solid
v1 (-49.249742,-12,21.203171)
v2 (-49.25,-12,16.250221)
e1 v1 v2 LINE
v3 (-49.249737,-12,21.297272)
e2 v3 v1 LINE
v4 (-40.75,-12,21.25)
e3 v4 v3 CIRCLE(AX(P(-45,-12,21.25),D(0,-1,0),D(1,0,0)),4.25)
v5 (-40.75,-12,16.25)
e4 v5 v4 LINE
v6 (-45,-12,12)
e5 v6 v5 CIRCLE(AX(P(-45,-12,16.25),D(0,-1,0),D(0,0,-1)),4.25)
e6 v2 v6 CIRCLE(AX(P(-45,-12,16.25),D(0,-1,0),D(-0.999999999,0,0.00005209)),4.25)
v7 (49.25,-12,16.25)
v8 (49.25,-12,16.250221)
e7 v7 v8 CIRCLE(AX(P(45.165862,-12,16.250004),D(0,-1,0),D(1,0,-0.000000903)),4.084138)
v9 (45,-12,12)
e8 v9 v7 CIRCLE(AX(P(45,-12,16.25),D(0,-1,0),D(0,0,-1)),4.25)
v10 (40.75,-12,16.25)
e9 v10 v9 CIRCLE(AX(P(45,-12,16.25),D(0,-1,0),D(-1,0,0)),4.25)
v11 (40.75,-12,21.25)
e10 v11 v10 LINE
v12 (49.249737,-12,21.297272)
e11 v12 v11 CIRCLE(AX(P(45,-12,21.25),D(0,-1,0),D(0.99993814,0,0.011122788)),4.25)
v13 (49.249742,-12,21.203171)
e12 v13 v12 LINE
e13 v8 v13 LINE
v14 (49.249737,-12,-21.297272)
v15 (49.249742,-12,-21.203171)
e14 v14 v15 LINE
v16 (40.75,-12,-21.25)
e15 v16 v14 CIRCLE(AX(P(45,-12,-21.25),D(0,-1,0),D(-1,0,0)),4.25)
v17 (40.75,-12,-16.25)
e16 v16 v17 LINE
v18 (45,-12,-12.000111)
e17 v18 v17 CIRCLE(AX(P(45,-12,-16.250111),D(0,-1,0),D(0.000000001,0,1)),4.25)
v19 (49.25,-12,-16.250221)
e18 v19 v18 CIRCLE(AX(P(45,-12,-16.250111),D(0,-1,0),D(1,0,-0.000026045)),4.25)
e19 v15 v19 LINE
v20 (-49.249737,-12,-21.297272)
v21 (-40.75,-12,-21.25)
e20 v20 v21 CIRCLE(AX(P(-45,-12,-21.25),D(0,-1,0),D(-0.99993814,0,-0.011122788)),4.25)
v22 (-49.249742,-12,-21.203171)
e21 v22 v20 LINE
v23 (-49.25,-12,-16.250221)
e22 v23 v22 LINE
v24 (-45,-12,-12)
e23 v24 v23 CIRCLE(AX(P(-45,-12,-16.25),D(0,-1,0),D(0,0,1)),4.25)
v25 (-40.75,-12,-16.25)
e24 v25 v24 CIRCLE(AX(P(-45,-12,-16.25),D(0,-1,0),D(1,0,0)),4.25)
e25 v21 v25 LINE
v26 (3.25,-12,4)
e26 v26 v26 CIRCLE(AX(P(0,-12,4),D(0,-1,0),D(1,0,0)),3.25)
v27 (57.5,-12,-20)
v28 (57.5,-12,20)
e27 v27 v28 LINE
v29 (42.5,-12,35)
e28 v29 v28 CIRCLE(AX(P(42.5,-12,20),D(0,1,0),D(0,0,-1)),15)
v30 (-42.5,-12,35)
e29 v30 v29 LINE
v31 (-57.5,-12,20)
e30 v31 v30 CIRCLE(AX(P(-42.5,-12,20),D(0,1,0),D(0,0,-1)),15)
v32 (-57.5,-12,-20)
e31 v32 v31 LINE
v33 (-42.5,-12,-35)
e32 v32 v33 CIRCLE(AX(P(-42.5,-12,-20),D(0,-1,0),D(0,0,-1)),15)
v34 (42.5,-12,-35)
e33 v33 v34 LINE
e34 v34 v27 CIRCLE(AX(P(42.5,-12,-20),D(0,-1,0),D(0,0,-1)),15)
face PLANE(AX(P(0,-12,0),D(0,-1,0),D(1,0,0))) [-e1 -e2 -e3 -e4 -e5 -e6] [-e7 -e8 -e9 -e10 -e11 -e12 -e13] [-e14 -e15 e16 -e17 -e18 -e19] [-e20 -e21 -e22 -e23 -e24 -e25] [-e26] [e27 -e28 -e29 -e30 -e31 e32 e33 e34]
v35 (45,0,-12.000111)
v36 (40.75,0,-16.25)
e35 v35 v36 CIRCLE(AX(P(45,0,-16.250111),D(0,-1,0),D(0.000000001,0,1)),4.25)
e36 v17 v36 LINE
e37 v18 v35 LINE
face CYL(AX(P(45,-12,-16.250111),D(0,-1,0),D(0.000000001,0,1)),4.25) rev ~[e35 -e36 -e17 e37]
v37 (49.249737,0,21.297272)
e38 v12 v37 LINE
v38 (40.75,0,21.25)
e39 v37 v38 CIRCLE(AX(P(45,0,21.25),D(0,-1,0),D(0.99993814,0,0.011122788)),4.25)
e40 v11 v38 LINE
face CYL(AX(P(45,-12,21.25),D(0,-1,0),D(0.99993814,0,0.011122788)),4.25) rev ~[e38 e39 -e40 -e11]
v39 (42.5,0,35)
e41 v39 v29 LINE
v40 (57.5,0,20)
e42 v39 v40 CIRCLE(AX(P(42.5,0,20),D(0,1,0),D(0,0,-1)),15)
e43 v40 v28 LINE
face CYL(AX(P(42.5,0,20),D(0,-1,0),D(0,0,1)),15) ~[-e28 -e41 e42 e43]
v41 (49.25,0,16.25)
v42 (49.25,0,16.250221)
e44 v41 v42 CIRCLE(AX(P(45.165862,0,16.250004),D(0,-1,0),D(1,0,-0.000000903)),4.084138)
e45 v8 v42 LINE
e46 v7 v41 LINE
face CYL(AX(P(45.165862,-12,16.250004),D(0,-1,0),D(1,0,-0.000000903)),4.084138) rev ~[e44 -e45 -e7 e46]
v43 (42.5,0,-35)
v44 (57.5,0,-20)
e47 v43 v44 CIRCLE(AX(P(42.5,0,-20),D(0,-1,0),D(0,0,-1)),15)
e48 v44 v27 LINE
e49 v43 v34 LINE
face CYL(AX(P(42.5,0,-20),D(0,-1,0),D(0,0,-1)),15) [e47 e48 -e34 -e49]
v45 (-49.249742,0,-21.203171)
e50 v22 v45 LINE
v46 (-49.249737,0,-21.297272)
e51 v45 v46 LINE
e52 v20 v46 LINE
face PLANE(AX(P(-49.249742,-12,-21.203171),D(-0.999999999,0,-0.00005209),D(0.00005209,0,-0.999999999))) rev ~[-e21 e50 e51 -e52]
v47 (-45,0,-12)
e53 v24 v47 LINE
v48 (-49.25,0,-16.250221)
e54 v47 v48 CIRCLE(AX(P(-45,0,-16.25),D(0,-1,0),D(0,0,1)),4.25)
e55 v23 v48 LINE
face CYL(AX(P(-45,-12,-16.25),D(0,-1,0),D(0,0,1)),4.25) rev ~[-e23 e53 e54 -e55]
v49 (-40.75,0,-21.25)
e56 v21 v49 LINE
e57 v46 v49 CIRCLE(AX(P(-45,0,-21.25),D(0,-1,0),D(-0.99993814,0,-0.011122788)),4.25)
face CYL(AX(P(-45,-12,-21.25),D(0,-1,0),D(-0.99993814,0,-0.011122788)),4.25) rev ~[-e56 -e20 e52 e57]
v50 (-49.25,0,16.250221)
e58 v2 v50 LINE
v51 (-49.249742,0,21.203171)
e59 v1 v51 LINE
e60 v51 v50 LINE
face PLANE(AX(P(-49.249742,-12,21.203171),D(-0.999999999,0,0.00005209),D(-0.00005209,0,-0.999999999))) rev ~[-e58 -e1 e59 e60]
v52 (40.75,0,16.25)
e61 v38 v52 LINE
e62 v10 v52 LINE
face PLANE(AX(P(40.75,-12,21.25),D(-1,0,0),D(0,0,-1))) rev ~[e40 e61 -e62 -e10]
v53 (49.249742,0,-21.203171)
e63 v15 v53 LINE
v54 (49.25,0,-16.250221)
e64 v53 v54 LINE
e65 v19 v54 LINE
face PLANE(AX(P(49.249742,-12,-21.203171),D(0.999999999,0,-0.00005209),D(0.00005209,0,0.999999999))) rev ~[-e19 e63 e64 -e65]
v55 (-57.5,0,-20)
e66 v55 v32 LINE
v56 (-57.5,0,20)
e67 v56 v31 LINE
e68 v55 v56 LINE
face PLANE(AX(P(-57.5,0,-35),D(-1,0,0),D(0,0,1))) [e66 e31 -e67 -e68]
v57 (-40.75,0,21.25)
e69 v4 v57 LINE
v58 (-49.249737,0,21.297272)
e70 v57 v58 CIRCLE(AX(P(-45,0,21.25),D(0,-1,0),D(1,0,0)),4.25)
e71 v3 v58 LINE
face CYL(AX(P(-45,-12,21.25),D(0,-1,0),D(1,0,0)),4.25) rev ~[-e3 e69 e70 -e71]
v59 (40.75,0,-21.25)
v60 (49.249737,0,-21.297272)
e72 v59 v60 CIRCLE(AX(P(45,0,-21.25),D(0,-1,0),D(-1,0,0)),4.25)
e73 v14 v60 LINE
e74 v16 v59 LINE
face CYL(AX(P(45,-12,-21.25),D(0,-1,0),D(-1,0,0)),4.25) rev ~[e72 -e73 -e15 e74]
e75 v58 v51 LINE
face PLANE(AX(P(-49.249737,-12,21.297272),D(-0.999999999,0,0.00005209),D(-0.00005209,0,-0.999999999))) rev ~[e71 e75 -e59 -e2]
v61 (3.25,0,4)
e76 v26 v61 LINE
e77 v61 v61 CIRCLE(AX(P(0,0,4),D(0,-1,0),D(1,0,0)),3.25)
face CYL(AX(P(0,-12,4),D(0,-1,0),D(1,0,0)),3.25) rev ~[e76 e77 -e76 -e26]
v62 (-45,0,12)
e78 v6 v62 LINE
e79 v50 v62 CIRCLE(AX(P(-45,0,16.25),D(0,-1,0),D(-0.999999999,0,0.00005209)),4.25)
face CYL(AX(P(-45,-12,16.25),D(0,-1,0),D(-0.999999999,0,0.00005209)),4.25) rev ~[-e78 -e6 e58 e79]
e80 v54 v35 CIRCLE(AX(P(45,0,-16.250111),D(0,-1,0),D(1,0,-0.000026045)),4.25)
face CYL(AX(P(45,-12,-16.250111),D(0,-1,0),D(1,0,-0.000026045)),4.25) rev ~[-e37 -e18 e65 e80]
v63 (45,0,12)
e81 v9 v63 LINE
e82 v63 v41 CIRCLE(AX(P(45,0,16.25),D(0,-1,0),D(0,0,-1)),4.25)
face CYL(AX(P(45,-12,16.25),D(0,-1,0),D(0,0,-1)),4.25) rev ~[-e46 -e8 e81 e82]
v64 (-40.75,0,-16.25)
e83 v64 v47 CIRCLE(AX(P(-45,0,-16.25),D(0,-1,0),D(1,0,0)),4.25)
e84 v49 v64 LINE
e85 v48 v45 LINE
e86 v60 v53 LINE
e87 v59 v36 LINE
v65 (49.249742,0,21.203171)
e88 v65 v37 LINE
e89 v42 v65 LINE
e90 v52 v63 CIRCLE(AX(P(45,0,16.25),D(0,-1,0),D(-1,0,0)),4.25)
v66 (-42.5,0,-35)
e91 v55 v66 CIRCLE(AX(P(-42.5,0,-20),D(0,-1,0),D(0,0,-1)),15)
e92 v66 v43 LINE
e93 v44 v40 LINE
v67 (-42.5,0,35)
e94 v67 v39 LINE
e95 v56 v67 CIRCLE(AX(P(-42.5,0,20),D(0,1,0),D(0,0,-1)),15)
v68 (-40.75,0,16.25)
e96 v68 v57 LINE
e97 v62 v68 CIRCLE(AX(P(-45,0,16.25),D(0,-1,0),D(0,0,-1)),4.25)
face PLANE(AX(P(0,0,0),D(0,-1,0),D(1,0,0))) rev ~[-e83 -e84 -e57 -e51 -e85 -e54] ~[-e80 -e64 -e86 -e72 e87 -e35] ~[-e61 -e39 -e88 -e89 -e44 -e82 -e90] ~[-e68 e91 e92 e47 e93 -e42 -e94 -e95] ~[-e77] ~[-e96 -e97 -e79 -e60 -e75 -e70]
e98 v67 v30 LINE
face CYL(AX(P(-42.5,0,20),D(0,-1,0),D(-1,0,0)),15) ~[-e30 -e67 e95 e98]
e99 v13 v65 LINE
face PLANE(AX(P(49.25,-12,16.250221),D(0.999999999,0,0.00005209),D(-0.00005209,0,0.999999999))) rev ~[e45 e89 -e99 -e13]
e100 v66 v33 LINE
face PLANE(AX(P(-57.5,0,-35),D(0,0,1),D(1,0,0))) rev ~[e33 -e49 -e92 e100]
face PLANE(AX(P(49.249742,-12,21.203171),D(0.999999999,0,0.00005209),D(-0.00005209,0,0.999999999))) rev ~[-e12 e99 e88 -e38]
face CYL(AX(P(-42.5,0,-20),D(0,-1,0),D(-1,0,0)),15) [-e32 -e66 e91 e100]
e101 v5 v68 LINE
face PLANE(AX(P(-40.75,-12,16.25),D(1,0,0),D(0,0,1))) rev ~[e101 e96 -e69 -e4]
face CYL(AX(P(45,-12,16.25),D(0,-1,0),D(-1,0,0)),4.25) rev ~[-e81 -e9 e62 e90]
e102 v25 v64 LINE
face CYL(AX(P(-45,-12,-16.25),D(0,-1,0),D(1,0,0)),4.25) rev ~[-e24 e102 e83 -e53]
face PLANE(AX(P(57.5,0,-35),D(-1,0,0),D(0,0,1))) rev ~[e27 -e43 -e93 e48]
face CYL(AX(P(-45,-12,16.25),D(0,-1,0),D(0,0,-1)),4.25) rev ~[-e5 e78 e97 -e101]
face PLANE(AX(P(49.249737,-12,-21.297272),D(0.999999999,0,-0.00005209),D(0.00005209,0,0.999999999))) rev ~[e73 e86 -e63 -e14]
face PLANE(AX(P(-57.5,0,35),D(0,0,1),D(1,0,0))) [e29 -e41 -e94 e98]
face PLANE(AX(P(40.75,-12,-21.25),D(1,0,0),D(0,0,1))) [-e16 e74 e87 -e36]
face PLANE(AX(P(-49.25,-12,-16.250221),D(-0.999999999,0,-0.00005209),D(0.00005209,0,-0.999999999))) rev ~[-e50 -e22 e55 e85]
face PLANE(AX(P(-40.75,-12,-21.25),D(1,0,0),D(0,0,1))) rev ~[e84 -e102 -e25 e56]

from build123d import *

# Parameters (mm, degrees)
F0_W     = 115
F0_H     = 70
F1_DEPTH = 12
F2_W     = 4.25
F2_H     = 5
F2_W_2   = 4.2500000007
F3_DEPTH = 25
F4_R     = 3.25
F5_DEPTH = 25
F6_R     = 15


with BuildPart() as f1:
    # F0 (on Front) → F1 (new body)
    with BuildSketch(Plane.XZ):
        Rectangle(F0_W, F0_H)
    extrude(amount=F1_DEPTH)

    # F2 (on face) → F3 (cut)
    with BuildSketch(Plane.XZ.offset(12)):
        with BuildLine():
            Line((-40.75, 16.25), (-40.75, 21.25))
            ThreePointArc((-40.75, 21.25), (-44.9763637107, 25.4999342731), (-49.2497370945, 21.2972718474))
            Line((-49.2497370945, 21.2972718474), (-49.2497419962, 21.2031708885))
            Line((-49.2497419962, 21.2031708885), (-49.2499999942, 16.2502213815))
            ThreePointArc((-49.2499999942, 16.2502213815), (-48.0052820892, 13.2448744512), (-45, 12))
            Line((-45, 12), (-45, 16.25))
            Line((-45, 16.25), (-40.75, 16.25))
        make_face()
        with BuildLine():
            ThreePointArc((49.2497370945, 21.2972718474), (44.9763637107, 25.4999342731), (40.75, 21.25))
            Line((40.75, 21.25), (40.75, 16.25))
            ThreePointArc((40.75, 16.25), (41.99479618, 19.25520382), (45, 20.5))
            ThreePointArc((45, 20.5), (46.9284060776, 20.0373143519), (48.4369317712, 18.75))
            ThreePointArc((48.4369317712, 18.75), (49.041590439, 17.5645519096), (49.2499999942, 16.2502213815))
            Line((49.2499999942, 16.2502213815), (49.2497419962, 21.2031708885))
            Line((49.2497419962, 21.2031708885), (49.2497370945, 21.2972718474))
        make_face()
        with BuildLine():
            ThreePointArc((-45, 12), (-41.99479618, 13.24479618), (-40.75, 16.25))
            Line((-40.75, 16.25), (-45, 16.25))
            Line((-45, 16.25), (-45, 12))
        make_face()
        with BuildLine():
            ThreePointArc((45, 20.5), (41.99479618, 19.25520382), (40.75, 16.25))
            Line((40.75, 16.25), (45, 16.25))
            Line((45, 16.25), (45, 20.5))
        make_face()
        with BuildLine():
            Line((45, 16.25), (40.75, 16.25))
            ThreePointArc((40.75, 16.25), (41.99479618, 13.24479618), (45, 12))
            Line((45, 12), (45, 16.25))
        make_face()
        with BuildLine():
            Line((45, 20.5), (45, 16.25))
            Line((45, 16.25), (45, 12))
            ThreePointArc((45, 12), (48.00520382, 13.24479618), (49.25, 16.25))
            ThreePointArc((49.25, 16.25), (49.2499999986, 16.2501106908), (49.2499999942, 16.2502213815))
            ThreePointArc((49.2499999942, 16.2502213815), (49.041590439, 17.5645519096), (48.4369317712, 18.75))
            ThreePointArc((48.4369317712, 18.75), (46.9284060776, 20.0373143519), (45, 20.5))
        make_face()
        with BuildLine():
            ThreePointArc((-40.75, -16.25), (-41.99479618, -13.24479618), (-45, -12))
            Line((-45, -12), (-45, -16.25))
            Line((-45, -16.25), (-40.75, -16.25))
        make_face()
        with BuildLine():
            Line((-45, -16.25), (-45, -12))
            ThreePointArc((-45, -12), (-48.0052820892, -13.2448744512), (-49.2499999942, -16.2502213815))
            Line((-49.2499999942, -16.2502213815), (-49.2497419962, -21.2031708885))
            Line((-49.2497419962, -21.2031708885), (-49.2497370945, -21.2972718474))
            ThreePointArc((-49.2497370945, -21.2972718474), (-44.9763637107, -25.4999342731), (-40.75, -21.25))
            Line((-40.75, -21.25), (-45, -21.25))
            Line((-45, -21.25), (-45, -16.25))
        make_face()
        with BuildLine():
            ThreePointArc((49.2499999957, -16.2502213815), (48.005242953, -13.2449460071), (45, -12.0001106908))
            Line((45, -12.0001106908), (45, -16.25))
            Line((45, -16.25), (45, -21.25))
            Line((45, -21.25), (40.75, -21.25))
            ThreePointArc((40.75, -21.25), (44.9763637107, -25.4999342731), (49.2497370945, -21.2972718474))
            Line((49.2497370945, -21.2972718474), (49.2497419962, -21.2031708885))
            Line((49.2497419962, -21.2031708885), (49.2499999942, -16.2502213815))
        make_face()
        with BuildLine():
            Line((45, -16.25), (45, -12.0001106908))
            ThreePointArc((45, -12.0001106908), (41.9948353134, -13.2448677349), (40.7499999986, -16.25))
            Line((40.7499999993, -16.25), (45, -16.25))
        make_face()
        with Locations((-42.875, -18.75)):
            Rectangle(F2_W, F2_H)
        with Locations((42.8749999996, -18.75)):
            Rectangle(F2_W_2, F2_H)
    extrude(amount=-F3_DEPTH, mode=Mode.SUBTRACT)

    # F4 (on face) → F5 (cut)
    with BuildSketch(Plane.XZ.offset(12)):
        with Locations((0, 4)):
            Circle(F4_R)
    extrude(amount=-F5_DEPTH, mode=Mode.SUBTRACT)

    # F6
    f6_edges = [f1.edges().sort_by_distance(p)[0] for p in [
        (-57.5, -6, 35),
        (57.5, -6, 35),
        (57.5, -6, -35),
        (-57.5, -6, -35),
    ]]
    fillet(f6_edges, radius=F6_R)


solid = f1.part
